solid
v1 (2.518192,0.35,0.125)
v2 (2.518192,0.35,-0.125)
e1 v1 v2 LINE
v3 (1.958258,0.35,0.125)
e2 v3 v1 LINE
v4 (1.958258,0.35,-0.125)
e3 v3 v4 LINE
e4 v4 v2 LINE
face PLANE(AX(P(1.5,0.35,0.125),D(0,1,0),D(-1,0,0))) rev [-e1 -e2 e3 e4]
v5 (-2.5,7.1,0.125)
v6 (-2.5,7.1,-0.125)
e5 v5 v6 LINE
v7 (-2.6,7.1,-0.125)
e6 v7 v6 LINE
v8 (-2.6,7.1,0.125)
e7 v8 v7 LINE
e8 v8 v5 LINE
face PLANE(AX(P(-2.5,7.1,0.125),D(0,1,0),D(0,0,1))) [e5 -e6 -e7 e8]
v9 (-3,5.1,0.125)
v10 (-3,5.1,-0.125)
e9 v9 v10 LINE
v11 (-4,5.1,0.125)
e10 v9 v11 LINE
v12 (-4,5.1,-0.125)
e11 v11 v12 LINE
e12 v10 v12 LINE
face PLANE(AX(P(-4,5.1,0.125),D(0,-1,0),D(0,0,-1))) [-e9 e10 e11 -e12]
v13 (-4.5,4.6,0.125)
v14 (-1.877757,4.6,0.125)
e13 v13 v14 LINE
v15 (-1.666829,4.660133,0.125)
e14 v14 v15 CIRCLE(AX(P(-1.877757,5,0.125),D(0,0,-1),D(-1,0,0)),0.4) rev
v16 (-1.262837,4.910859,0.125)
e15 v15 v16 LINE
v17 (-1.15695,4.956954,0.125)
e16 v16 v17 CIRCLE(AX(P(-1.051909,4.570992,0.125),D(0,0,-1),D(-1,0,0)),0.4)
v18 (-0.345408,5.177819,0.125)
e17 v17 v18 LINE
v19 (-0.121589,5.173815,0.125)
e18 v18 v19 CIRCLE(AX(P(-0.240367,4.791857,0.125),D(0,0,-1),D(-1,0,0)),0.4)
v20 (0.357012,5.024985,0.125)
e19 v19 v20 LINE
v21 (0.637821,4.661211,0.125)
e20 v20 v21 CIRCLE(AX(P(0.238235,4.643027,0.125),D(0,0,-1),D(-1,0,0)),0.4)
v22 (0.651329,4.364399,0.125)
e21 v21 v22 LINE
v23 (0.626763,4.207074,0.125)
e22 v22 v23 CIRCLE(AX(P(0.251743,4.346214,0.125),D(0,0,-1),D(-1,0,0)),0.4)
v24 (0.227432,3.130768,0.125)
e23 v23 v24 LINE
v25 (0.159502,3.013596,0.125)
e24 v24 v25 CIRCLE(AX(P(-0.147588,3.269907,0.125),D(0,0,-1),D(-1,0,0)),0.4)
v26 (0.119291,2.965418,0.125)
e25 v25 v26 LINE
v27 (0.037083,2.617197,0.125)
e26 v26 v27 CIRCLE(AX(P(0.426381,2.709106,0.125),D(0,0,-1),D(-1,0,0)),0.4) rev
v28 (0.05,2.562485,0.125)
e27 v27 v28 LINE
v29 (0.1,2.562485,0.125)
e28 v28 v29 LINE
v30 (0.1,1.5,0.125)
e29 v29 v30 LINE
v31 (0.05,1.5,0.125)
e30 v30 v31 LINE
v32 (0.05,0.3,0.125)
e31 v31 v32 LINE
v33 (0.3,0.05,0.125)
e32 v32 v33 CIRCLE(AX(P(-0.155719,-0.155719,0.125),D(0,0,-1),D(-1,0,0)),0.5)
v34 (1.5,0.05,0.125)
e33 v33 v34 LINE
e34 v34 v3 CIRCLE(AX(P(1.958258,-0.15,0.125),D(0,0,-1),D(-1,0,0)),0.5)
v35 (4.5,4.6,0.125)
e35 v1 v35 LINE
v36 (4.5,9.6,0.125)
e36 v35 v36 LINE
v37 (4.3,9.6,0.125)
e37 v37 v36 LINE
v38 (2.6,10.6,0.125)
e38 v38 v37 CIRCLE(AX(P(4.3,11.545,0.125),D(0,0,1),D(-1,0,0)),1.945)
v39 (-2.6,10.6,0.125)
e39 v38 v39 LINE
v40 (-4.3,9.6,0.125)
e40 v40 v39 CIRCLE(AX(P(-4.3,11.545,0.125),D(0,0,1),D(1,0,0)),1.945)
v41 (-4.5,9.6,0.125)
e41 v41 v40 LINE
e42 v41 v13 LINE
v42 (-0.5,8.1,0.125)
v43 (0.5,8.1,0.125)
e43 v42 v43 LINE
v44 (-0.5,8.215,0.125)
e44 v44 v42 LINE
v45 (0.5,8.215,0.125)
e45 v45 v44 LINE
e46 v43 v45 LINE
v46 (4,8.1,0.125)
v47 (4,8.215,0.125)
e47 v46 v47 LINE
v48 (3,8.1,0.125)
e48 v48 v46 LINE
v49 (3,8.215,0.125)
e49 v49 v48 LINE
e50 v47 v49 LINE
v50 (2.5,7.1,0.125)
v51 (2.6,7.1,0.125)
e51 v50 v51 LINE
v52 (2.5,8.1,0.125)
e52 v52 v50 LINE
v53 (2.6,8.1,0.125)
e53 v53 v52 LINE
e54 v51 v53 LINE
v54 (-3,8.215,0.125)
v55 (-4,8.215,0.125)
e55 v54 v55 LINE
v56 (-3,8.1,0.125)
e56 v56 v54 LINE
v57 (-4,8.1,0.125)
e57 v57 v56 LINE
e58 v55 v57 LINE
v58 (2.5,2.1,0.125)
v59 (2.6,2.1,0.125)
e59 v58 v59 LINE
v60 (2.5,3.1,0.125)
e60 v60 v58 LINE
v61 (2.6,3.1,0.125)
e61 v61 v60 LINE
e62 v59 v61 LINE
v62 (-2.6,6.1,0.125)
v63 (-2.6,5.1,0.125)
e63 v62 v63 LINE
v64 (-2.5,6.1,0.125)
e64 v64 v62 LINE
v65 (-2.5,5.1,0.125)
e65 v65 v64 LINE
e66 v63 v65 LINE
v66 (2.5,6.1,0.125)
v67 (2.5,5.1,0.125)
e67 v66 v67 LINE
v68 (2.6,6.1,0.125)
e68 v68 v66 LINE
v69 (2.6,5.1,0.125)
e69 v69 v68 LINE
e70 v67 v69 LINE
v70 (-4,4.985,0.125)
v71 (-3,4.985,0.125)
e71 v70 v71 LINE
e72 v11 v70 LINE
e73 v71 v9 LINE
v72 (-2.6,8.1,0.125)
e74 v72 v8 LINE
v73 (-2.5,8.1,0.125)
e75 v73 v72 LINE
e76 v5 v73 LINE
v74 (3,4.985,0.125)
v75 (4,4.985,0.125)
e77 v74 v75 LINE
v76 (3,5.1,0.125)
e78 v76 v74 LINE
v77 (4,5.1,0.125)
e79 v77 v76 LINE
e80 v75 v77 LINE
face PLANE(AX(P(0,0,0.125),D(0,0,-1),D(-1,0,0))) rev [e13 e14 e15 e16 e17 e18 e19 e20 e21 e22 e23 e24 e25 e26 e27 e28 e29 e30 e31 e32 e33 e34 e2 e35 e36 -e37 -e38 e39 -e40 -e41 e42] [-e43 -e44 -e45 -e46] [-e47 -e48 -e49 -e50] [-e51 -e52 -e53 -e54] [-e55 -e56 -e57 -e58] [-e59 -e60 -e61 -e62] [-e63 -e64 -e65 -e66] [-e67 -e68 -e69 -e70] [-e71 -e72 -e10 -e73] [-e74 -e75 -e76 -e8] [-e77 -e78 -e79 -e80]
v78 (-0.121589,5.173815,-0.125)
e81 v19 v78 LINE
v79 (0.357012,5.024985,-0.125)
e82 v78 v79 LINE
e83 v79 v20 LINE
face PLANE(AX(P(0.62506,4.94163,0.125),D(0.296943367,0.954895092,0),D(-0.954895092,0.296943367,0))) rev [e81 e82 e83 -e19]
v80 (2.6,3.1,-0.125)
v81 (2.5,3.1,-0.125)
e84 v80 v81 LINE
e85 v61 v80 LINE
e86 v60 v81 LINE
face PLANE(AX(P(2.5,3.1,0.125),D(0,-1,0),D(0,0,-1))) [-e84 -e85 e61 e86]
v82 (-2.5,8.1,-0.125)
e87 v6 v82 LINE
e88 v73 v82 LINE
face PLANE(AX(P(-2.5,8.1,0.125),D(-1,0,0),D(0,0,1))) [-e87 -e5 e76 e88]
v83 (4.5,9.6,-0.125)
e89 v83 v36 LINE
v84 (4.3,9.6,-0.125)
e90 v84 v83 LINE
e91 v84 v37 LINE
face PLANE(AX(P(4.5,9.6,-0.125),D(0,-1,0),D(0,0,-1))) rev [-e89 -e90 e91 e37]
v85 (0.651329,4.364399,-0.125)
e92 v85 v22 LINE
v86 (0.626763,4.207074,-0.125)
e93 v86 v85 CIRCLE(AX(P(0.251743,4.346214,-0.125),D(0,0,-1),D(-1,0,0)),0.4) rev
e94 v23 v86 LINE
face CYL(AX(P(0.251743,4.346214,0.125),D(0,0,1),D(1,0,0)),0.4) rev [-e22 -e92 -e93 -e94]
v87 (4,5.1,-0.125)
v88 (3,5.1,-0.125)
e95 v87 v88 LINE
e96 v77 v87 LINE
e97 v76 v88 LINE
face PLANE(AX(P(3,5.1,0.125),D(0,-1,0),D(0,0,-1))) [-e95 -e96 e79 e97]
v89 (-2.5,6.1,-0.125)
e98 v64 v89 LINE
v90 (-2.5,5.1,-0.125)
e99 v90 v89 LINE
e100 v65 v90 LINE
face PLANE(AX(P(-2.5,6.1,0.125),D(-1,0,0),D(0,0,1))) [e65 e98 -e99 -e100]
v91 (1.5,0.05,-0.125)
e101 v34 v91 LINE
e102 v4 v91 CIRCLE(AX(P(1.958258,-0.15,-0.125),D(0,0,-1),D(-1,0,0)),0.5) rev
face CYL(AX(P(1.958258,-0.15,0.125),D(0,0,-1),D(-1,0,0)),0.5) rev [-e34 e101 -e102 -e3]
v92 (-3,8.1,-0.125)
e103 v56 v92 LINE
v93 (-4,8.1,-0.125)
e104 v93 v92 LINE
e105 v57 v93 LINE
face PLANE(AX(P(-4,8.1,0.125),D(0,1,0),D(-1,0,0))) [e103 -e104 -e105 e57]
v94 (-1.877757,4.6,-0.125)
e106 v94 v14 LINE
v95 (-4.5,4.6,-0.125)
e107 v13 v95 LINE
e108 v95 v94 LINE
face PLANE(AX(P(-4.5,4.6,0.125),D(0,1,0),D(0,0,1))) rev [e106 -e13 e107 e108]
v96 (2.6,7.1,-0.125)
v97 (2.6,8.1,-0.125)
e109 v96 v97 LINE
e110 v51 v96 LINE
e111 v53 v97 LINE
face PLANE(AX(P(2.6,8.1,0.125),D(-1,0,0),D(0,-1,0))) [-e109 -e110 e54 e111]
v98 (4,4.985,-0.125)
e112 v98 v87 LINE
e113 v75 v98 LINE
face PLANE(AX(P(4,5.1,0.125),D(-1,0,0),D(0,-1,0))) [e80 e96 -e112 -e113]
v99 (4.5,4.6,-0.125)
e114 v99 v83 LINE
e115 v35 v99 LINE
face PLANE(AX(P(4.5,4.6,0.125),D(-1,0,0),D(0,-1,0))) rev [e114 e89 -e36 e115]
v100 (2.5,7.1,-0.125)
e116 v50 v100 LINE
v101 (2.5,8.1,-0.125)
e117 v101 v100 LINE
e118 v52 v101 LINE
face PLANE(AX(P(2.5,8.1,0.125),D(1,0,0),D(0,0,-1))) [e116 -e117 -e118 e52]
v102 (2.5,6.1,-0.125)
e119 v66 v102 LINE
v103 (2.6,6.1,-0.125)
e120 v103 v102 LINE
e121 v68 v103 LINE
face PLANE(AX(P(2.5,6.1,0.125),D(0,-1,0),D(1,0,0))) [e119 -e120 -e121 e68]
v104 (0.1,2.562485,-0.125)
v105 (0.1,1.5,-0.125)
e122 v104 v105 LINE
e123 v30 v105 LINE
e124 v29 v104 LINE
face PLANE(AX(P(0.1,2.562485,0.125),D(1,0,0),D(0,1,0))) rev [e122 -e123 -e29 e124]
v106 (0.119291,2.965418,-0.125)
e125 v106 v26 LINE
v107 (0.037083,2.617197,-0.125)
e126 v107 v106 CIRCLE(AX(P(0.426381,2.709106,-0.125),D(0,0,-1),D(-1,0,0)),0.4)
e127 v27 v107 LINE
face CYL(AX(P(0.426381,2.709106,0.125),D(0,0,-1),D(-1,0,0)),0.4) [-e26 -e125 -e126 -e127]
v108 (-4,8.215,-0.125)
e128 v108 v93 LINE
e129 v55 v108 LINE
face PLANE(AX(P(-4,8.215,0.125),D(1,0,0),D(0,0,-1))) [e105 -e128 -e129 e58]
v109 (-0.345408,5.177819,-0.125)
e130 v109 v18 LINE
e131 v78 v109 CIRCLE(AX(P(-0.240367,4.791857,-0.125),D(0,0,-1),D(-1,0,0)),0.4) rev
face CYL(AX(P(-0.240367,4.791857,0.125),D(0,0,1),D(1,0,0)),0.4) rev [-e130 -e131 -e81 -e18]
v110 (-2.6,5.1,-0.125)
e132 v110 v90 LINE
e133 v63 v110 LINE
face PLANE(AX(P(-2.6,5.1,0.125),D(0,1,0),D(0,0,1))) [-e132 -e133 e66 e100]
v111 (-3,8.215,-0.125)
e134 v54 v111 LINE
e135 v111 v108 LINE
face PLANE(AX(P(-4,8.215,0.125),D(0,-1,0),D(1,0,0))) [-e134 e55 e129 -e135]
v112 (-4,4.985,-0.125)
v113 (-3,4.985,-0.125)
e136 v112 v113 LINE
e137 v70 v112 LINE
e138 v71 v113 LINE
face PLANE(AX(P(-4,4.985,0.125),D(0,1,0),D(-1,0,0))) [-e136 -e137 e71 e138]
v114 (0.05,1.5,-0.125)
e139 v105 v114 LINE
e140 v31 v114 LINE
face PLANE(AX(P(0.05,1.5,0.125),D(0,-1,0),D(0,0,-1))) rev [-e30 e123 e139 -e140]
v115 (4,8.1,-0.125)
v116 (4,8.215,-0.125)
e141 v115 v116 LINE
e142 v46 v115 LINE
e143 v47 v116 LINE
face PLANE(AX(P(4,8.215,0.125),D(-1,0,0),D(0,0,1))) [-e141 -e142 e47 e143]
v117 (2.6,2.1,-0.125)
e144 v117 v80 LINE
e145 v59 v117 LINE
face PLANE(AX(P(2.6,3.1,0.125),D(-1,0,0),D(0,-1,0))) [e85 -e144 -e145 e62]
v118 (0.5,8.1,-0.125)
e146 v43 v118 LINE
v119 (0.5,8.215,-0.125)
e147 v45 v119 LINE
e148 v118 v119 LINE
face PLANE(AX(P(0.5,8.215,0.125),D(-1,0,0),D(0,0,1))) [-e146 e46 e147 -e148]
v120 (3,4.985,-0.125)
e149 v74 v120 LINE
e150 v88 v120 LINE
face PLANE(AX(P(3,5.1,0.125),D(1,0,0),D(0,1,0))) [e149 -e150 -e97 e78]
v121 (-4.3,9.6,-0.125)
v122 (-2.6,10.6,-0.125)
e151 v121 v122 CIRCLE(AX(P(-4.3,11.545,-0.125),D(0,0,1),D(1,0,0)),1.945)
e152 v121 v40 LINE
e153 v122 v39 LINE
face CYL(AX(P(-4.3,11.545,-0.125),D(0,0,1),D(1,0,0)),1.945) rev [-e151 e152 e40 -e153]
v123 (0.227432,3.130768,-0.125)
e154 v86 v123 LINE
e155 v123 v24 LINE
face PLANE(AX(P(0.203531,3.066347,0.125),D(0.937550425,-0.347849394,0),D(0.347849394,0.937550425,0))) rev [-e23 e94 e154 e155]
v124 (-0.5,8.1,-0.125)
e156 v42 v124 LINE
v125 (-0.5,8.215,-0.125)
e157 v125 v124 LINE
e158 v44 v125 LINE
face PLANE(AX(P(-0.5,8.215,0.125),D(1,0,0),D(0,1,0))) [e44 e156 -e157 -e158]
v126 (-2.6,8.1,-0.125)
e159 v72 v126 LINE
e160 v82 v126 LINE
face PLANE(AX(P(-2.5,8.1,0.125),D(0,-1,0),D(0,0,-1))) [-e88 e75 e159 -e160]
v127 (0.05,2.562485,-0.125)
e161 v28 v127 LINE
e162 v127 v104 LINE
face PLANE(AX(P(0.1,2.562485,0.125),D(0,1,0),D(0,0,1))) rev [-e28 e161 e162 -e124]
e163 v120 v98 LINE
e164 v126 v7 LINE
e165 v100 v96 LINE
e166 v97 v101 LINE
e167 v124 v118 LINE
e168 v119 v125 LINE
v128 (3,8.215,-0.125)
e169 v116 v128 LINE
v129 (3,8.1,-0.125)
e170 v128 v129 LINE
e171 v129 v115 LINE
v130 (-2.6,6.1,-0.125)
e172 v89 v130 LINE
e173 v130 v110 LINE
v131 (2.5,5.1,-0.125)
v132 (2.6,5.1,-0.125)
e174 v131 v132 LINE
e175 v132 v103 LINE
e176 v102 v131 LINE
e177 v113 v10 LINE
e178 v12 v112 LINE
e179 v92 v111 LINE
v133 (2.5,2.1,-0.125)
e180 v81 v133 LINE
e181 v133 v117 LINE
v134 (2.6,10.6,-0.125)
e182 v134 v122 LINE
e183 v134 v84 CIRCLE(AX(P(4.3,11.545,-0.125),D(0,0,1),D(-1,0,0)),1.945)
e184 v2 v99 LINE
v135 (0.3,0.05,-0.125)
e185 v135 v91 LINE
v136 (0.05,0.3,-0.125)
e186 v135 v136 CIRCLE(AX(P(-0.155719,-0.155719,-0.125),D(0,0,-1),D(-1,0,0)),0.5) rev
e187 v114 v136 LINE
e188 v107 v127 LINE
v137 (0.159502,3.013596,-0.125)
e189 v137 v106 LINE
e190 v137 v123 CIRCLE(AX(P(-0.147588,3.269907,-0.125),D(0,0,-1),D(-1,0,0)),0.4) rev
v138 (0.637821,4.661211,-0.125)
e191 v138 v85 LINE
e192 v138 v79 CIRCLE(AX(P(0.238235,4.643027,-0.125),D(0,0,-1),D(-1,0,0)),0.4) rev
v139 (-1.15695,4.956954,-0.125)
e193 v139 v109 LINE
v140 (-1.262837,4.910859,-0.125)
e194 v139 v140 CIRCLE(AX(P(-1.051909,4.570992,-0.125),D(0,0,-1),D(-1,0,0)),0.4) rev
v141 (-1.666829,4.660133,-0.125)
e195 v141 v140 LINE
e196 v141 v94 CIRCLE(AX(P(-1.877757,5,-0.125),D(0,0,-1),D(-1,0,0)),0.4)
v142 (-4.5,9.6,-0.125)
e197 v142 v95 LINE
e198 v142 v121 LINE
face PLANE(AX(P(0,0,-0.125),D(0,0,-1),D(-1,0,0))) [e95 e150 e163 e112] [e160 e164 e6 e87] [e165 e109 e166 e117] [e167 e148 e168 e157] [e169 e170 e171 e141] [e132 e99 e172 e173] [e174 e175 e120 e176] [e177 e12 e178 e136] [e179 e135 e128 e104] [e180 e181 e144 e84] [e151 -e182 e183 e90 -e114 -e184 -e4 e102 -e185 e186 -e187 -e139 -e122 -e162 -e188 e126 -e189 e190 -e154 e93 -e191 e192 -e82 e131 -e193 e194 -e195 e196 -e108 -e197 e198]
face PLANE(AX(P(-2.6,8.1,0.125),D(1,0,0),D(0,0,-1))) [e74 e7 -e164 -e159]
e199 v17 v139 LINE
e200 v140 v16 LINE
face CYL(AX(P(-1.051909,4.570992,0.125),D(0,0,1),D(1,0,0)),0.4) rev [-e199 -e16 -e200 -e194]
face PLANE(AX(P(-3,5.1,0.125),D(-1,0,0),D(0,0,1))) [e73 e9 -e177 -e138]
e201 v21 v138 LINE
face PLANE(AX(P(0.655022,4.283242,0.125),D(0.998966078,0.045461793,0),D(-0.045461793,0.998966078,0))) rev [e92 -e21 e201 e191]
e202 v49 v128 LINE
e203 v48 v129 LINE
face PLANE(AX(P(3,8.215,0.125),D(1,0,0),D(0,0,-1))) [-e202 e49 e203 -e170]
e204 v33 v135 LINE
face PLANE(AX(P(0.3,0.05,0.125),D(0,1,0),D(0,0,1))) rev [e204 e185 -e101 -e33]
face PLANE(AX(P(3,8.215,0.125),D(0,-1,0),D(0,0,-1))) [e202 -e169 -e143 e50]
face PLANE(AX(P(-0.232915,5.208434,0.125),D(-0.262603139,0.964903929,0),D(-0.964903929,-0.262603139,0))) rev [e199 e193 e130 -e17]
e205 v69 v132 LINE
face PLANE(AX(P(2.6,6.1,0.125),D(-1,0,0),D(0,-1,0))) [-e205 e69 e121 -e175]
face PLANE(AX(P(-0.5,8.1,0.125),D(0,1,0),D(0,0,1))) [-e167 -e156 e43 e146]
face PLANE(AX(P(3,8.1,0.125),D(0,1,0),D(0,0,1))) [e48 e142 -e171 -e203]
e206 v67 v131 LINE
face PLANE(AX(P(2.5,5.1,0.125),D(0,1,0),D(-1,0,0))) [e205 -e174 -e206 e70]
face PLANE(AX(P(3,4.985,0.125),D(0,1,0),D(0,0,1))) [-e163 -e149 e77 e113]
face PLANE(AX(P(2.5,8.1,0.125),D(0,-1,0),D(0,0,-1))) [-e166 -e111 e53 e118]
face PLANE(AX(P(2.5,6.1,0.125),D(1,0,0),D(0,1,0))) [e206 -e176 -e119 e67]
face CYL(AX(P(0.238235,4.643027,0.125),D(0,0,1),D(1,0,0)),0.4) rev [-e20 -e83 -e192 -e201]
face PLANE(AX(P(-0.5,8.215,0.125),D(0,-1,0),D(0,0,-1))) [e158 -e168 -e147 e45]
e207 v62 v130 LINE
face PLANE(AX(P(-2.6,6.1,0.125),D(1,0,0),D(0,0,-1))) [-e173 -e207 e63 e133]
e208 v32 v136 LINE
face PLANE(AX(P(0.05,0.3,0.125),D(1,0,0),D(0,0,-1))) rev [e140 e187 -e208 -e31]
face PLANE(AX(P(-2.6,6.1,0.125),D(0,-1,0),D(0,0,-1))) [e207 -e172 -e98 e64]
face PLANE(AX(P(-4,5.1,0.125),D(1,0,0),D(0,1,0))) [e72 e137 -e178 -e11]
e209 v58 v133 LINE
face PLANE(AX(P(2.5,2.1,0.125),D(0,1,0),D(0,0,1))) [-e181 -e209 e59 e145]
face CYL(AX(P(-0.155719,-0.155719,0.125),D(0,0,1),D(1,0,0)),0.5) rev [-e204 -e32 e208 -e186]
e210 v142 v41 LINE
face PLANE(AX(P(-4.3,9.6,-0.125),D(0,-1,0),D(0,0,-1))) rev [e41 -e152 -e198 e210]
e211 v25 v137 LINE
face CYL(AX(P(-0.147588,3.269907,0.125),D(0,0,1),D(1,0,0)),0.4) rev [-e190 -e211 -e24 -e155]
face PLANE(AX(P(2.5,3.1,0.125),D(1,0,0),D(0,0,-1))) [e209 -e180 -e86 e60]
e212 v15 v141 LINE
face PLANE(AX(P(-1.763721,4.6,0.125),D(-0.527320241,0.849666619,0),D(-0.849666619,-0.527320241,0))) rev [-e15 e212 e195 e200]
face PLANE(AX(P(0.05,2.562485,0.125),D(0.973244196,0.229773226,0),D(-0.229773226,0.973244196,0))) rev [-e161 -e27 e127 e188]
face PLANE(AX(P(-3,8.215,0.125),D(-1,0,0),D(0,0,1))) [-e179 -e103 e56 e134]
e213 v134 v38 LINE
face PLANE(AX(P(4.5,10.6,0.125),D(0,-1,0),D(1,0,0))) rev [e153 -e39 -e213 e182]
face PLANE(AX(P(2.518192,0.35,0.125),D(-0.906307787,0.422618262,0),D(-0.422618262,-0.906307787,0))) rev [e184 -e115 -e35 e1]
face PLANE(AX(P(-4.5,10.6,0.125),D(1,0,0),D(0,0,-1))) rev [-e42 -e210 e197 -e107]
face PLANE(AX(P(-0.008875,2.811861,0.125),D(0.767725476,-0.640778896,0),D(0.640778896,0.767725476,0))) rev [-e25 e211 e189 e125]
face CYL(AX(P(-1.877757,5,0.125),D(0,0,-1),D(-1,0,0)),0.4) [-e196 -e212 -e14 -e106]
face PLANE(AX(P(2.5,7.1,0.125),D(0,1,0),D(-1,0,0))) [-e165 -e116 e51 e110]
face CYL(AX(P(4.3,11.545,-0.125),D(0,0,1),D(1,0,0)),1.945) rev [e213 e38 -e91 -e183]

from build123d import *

# Parameters (mm, degrees)
FRAME_OUTLINE_W     = 1
FRAME_OUTLINE_H     = 0.115
FRAME_OUTLINE_W_2   = 0.1
FRAME_OUTLINE_H_2   = 1
BOSS_EXTRUDE1_DEPTH = 0.125
FILLET1_R           = 0.5
FILLET2_R           = 0.4
CUT_EXTRUDE1_DEPTH  = 12.518354917


with BuildPart() as part:
    # frame_outline → Boss-Extrude1 (new, symmetric)
    with BuildSketch(Plane.XY):
        Polygon((0.05, 0.3), (0.05, 1.5), (0.1, 1.5), (0.1, 2.562485241), (0.05, 2.562485241), (-0.008875073, 2.811860782), (0.203530984, 3.066347223), (0.655022448, 4.283241722), (0.625059951, 4.94163014), (-0.232915246, 5.208434363), (-1.213255559, 4.94163014), (-1.763721297, 4.6), (-4.5, 4.6), (-4.5, 10.6), (4.5, 10.6), (4.5, 4.6), (2.518192453, 0.35), (1.5, 0.35), (1.5, 0.05), (0.3, 0.05), (0.3, 0.3), align=None)
        with Locations((0, 8.1575)):
            Rectangle(FRAME_OUTLINE_W, FRAME_OUTLINE_H, mode=Mode.SUBTRACT)
        with Locations((-2.55, 7.6)):
            Rectangle(FRAME_OUTLINE_W_2, FRAME_OUTLINE_H_2, mode=Mode.SUBTRACT)
        with Locations((-2.55, 5.6)):
            Rectangle(FRAME_OUTLINE_W_2, FRAME_OUTLINE_H_2, mode=Mode.SUBTRACT)
        with Locations((2.55, 7.6)):
            Rectangle(FRAME_OUTLINE_W_2, FRAME_OUTLINE_H_2, mode=Mode.SUBTRACT)
        with Locations((2.55, 5.6)):
            Rectangle(FRAME_OUTLINE_W_2, FRAME_OUTLINE_H_2, mode=Mode.SUBTRACT)
        with Locations((2.55, 2.6)):
            Rectangle(FRAME_OUTLINE_W_2, FRAME_OUTLINE_H_2, mode=Mode.SUBTRACT)
        with Locations((-3.5, 8.1575)):
            Rectangle(FRAME_OUTLINE_W, FRAME_OUTLINE_H, mode=Mode.SUBTRACT)
        with Locations((3.5, 8.1575)):
            Rectangle(FRAME_OUTLINE_W, FRAME_OUTLINE_H, mode=Mode.SUBTRACT)
        with Locations((-3.5, 5.0425)):
            Rectangle(FRAME_OUTLINE_W, FRAME_OUTLINE_H, mode=Mode.SUBTRACT)
        with Locations((3.5, 5.0425)):
            Rectangle(FRAME_OUTLINE_W, FRAME_OUTLINE_H, mode=Mode.SUBTRACT)
    extrude(amount=BOSS_EXTRUDE1_DEPTH, both=True)

    # Fillet1
    # the kernel refuses this fillet: 0.5 mm, written as the material it adds along each edge
    with BuildSketch(Plane(origin=(1.5, 0.35, 0.125), x_dir=(0, -1, 0), z_dir=(0, 0, -1))) as fillet1_piece_1:
        with BuildLine():
            CenterArc((0.5, -0.458257569), FILLET1_R, 113.578178478, 66.421821522)
            Line((0, -0.458257569), (0, 0))
            Line((0, 0), (0.3, 0))
        make_face()
    extrude(amount=0.25)
    with BuildSketch(Plane(origin=(0.3, 0.3, -0.125), x_dir=(0, -1, 0), z_dir=(0, 0, 1))) as fillet1_piece_2:
        with BuildLine():
            CenterArc((0.455718914, -0.455718914), FILLET1_R, 114.295188945, 41.409622109)
            Line((0, -0.25), (0, 0))
            Line((0, 0), (0.25, 0))
        make_face()
    extrude(amount=0.25)

    # Fillet2
    fillet2_edges = [part.edges().sort_by_distance(p)[0] for p in [
        (-0.008875073, 2.811860782, 0),
        (0.203530984, 3.066347223, 0),
        (0.655022448, 4.283241722, 0),
        (0.625059951, 4.94163014, 0),
        (-0.232915246, 5.208434363, 0),
        (-1.213255559, 4.94163014, 0),
        (-1.763721297, 4.6, 0),
    ]]
    fillet(fillet2_edges, radius=FILLET2_R)

    # Sketch1 → Cut-Extrude1 (cut, through all)
    with BuildSketch(Plane.XY.offset(0.125)):
        with BuildLine():
            Line((-4.5, 9.6), (-4.5, 10.6))
            Line((-4.5, 10.6), (-2.6, 10.6))
            ThreePointArc((-2.6, 10.6), (-3.313845854, 9.868537952), (-4.3, 9.6))
            Line((-4.3, 9.6), (-4.5, 9.6))
        make_face()
        with BuildLine():
            Line((4.5, 10.6), (4.5, 9.6))
            Line((4.5, 9.6), (4.3, 9.6))
            ThreePointArc((4.3, 9.6), (3.313845854, 9.868537952), (2.6, 10.6))
            Line((2.6, 10.6), (4.5, 10.6))
        make_face()
    extrude(amount=-CUT_EXTRUDE1_DEPTH, mode=Mode.SUBTRACT)


solid = part.part
